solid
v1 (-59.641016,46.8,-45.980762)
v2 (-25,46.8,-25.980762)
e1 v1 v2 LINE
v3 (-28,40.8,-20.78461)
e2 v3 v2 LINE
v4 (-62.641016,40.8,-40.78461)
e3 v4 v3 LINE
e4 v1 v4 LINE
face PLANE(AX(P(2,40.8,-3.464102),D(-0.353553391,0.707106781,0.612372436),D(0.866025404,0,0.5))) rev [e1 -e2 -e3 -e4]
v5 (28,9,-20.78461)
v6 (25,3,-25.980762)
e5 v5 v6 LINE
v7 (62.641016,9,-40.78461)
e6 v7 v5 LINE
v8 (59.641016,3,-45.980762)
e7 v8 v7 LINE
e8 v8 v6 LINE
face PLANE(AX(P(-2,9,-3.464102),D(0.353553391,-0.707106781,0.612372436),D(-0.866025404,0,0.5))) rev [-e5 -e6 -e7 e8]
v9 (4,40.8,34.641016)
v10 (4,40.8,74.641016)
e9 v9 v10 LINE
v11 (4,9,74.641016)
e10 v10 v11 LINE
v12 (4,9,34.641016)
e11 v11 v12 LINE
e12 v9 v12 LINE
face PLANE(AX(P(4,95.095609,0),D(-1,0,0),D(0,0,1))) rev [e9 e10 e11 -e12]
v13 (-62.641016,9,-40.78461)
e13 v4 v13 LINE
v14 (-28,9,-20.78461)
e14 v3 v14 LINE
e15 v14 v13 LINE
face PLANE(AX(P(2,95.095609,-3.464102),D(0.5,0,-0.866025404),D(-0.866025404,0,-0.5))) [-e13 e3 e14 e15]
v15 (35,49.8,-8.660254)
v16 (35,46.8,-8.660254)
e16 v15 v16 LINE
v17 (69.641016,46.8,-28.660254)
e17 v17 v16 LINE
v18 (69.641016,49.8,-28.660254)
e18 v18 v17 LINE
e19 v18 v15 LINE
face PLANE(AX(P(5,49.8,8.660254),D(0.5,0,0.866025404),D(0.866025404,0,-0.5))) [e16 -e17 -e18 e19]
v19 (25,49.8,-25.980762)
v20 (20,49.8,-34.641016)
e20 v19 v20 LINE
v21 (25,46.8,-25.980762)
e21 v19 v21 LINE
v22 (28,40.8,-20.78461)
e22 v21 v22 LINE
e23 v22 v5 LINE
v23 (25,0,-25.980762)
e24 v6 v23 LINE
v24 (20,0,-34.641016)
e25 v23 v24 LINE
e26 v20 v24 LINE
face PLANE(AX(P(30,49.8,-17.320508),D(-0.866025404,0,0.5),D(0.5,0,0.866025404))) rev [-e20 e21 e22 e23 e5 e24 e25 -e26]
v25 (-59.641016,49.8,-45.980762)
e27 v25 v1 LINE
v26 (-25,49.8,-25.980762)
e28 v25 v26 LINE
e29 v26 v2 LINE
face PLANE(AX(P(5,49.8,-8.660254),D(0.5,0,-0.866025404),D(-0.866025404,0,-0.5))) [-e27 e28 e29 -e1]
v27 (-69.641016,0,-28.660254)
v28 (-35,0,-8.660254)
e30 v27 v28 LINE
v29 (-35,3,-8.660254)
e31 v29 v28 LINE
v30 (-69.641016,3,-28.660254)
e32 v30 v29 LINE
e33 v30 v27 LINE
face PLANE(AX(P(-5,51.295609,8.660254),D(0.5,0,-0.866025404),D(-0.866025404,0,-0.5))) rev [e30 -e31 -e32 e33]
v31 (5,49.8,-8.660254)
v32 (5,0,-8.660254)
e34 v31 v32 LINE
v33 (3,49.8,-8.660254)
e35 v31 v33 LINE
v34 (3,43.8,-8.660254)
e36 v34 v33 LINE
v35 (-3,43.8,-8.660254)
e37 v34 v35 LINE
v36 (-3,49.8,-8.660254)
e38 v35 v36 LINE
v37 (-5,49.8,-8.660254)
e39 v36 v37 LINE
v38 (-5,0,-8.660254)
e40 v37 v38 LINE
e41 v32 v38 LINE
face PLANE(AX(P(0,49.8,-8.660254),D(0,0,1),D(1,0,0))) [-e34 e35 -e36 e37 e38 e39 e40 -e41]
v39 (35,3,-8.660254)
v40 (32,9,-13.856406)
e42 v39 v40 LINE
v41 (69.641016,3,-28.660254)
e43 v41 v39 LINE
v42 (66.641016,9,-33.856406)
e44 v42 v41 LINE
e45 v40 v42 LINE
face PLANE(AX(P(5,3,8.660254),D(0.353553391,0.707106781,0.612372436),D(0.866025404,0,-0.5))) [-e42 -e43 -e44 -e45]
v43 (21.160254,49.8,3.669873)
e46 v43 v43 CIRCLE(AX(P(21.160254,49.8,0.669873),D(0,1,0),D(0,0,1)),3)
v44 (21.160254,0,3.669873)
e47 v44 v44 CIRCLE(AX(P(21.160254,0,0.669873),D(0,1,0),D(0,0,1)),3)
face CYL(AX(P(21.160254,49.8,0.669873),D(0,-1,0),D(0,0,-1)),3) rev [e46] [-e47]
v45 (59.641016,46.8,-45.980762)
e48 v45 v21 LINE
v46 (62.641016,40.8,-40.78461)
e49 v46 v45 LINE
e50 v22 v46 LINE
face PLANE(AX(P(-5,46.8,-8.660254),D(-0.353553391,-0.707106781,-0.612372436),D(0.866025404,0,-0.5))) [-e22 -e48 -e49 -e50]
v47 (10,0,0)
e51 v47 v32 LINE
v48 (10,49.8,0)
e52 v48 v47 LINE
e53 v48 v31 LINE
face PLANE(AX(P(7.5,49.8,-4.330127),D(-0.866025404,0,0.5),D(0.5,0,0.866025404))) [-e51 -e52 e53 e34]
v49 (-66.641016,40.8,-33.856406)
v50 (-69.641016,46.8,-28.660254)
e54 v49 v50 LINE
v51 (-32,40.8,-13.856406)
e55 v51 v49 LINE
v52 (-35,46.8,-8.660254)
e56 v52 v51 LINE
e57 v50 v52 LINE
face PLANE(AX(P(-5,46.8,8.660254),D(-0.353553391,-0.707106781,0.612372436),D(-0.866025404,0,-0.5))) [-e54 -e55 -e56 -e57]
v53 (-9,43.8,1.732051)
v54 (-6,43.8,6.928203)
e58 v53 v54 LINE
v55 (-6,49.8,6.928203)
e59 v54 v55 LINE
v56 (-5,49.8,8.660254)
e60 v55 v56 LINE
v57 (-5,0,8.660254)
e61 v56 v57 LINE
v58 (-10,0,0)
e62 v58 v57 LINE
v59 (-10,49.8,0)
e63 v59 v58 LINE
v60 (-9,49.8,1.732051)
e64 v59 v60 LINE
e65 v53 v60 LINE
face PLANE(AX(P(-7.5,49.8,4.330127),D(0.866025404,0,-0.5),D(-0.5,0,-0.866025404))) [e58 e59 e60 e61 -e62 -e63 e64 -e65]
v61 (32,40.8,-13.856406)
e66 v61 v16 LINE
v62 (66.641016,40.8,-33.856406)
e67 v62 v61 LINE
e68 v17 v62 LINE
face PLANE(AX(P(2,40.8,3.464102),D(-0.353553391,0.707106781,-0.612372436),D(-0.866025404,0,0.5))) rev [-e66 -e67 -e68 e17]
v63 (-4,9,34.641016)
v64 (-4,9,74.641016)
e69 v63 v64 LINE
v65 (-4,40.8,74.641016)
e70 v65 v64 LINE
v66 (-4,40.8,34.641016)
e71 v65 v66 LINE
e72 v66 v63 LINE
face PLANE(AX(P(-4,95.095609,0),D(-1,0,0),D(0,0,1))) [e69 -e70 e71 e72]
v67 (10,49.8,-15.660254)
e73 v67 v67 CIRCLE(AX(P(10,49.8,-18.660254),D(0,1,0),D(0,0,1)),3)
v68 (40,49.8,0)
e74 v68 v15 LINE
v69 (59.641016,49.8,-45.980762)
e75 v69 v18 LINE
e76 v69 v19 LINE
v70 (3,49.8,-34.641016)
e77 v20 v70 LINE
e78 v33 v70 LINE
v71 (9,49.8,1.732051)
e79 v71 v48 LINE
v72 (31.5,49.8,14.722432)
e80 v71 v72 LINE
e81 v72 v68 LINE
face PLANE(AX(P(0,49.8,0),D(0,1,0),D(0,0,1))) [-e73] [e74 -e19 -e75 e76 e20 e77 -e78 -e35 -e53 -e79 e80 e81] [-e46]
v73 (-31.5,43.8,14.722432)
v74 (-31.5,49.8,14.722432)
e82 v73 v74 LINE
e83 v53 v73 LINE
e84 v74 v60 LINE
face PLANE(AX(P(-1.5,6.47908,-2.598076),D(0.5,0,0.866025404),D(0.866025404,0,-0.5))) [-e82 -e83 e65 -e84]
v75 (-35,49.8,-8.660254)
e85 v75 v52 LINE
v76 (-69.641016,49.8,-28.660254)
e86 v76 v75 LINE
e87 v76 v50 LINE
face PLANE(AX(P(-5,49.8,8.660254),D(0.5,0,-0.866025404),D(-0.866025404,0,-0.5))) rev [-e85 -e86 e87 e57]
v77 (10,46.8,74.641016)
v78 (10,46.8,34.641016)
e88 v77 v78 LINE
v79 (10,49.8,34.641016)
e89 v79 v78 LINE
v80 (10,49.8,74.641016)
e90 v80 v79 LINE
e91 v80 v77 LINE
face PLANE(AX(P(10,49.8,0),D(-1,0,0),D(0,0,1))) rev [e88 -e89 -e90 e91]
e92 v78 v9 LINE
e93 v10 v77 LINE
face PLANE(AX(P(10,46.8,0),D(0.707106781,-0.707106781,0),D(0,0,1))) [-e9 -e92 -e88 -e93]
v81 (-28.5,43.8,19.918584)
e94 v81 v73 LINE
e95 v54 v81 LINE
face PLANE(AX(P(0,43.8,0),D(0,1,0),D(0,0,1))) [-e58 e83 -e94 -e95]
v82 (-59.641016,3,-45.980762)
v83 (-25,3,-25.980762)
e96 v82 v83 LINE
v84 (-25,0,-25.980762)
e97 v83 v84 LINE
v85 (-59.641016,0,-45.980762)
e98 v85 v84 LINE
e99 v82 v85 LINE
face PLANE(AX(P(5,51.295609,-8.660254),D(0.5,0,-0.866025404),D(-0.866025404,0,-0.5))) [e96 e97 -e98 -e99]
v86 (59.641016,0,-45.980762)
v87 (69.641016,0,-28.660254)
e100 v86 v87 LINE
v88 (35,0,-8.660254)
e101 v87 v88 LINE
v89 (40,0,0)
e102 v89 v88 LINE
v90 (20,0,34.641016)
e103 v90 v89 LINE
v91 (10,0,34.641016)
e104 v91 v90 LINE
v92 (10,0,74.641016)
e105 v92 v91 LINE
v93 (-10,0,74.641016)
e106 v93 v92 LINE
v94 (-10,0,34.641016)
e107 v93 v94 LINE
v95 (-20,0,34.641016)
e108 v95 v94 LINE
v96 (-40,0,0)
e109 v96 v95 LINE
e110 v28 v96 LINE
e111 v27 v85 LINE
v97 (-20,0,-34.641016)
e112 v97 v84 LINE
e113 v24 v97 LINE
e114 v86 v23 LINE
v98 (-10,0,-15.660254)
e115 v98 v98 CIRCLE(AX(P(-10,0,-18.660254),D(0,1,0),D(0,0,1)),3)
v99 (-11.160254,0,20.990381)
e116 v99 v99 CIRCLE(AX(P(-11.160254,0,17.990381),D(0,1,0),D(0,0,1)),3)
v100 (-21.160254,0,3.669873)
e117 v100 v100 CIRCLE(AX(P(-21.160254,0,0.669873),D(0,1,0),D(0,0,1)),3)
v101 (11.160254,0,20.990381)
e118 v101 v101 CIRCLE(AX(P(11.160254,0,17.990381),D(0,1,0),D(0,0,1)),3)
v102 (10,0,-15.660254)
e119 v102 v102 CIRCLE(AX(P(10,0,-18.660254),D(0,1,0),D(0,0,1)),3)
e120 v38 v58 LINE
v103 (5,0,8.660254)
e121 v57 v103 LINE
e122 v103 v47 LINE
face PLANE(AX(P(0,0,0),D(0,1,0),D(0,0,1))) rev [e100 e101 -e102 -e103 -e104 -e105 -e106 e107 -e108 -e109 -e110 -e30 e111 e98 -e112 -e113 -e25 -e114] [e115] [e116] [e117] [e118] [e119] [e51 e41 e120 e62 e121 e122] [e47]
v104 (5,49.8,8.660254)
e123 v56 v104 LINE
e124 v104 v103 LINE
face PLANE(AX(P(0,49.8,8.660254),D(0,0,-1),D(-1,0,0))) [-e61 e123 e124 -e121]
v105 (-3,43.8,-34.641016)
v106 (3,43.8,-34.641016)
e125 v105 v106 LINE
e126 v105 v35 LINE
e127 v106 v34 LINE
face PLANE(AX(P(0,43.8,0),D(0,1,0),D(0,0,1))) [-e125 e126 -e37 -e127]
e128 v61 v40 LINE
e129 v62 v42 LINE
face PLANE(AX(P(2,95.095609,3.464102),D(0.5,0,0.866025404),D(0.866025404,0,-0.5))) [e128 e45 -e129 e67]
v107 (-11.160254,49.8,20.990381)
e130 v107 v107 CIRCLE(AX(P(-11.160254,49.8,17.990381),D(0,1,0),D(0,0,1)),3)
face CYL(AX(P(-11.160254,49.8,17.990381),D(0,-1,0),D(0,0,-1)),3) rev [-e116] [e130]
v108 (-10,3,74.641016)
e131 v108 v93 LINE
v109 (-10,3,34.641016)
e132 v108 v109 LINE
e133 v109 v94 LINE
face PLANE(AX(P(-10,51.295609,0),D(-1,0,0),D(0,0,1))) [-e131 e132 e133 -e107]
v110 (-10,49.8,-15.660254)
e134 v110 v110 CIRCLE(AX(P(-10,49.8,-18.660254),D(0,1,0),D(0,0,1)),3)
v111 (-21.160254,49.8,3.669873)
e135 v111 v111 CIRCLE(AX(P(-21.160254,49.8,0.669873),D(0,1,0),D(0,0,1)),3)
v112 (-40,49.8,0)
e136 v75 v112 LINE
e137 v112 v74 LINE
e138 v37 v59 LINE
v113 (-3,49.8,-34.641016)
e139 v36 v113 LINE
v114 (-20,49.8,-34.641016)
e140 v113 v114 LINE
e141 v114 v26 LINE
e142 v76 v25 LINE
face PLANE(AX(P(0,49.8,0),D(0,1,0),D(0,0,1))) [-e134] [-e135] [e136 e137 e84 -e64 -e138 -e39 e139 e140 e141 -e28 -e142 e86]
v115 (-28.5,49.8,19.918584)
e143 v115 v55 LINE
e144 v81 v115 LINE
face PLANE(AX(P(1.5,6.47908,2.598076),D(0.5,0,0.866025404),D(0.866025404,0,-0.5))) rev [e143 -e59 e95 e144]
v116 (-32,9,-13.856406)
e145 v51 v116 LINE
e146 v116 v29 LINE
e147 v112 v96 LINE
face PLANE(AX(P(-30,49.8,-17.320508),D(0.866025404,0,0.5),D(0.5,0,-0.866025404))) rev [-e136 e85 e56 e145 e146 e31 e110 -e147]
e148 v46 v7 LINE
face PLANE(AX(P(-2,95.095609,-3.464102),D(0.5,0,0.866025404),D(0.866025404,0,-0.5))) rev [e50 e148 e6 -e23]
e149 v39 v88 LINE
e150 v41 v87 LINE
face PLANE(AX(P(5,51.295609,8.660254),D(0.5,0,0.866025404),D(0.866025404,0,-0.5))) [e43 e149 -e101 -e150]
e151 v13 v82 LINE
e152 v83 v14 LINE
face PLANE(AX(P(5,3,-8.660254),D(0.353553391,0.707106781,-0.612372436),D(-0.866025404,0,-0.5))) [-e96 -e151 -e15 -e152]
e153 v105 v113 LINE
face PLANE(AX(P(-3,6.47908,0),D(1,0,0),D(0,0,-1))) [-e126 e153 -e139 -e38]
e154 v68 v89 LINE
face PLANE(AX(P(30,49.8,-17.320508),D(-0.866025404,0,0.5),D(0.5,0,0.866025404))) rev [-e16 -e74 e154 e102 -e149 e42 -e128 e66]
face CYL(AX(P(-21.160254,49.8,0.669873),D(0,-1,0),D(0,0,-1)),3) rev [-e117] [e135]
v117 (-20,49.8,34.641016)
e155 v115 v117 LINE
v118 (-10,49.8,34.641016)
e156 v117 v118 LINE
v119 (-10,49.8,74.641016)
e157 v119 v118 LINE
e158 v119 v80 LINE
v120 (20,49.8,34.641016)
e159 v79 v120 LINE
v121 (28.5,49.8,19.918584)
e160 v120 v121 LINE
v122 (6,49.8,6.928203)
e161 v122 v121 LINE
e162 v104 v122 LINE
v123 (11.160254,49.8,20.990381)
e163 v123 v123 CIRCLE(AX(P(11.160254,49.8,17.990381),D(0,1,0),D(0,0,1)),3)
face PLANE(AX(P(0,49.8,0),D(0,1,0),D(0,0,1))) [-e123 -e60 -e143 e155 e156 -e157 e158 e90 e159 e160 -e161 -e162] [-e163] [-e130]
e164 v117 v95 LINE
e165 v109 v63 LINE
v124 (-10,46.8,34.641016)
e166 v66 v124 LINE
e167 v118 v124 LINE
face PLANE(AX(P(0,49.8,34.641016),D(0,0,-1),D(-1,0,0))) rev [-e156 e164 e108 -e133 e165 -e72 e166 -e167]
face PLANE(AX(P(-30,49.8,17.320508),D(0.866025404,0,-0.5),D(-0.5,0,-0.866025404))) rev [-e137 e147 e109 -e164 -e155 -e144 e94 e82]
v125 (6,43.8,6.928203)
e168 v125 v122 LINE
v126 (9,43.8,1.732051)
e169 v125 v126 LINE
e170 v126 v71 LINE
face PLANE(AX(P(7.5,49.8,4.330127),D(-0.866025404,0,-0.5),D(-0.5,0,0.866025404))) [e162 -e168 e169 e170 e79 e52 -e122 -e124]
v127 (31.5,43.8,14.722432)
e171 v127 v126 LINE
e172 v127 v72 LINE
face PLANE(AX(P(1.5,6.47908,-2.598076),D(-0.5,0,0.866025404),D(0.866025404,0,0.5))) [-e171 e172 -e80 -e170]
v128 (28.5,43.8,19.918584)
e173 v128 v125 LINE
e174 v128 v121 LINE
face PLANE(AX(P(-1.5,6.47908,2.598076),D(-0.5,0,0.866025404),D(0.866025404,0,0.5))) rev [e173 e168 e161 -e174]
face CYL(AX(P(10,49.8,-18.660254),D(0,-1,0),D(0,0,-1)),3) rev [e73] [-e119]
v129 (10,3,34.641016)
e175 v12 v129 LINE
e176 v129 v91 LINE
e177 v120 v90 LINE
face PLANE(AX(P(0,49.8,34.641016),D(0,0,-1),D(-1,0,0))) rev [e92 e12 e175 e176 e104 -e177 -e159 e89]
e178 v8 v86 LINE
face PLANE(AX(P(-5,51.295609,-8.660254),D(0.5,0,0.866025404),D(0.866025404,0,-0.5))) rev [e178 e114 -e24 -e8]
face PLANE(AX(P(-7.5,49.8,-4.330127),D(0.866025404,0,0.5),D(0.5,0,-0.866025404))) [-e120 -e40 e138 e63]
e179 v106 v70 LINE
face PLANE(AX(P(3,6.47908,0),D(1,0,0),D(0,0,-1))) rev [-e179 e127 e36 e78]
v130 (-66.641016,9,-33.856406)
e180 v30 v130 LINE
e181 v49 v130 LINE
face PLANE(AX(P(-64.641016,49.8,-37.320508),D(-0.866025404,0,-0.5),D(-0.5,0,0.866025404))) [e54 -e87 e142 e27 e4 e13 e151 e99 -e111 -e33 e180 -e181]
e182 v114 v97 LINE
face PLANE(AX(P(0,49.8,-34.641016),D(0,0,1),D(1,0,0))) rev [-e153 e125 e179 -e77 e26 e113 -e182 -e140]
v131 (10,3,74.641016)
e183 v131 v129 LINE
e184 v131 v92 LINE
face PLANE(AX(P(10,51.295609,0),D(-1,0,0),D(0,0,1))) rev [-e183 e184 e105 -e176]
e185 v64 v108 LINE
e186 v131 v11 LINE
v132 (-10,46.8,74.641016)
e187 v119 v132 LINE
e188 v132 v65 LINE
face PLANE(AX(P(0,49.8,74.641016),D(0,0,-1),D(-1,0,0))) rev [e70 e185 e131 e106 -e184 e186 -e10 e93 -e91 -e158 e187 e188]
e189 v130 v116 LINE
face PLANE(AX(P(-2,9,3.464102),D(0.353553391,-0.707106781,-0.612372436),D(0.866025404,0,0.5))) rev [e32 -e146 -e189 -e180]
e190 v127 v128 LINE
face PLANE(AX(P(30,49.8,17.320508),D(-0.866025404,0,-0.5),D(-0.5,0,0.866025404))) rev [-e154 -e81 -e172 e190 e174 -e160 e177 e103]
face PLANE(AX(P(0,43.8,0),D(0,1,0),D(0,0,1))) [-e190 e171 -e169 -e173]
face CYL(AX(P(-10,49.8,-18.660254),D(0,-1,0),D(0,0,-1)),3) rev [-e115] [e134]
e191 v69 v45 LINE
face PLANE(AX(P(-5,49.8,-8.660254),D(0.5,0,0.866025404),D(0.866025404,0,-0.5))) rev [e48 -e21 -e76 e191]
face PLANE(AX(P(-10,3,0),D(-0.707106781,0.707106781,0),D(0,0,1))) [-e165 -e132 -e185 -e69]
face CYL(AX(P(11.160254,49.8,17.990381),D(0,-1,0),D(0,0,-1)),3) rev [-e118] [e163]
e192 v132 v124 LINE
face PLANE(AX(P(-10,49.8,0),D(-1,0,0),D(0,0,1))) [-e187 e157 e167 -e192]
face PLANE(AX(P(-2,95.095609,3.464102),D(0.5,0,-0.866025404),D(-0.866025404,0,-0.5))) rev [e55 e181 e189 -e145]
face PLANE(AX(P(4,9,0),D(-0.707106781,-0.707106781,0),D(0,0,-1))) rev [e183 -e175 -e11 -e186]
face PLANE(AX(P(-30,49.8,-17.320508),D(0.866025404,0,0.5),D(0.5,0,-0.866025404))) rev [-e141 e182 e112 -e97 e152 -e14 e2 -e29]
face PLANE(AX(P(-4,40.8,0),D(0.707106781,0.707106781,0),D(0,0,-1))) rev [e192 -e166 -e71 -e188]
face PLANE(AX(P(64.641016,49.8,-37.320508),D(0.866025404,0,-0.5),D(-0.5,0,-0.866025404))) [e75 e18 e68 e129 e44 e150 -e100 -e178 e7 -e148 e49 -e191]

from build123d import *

# Parameters (mm, degrees)
SKETCH1_R           = 3
SKETCH1_W           = 6
SKETCH1_H           = 40
SKETCH1_W_2         = 8
BOSS_EXTRUDE1_DEPTH = 49.8
SKETCH1_4_W         = 6
SKETCH1_4_H         = 40
CUT_EXTRUDE2_DEPTH  = 46.8
SKETCH1_5_W         = 6
SKETCH1_5_H         = 40
BOSS_EXTRUDE3_DEPTH = 3
CHAMFER1_SIZE       = 6
SKETCH2_3_W         = 6
SKETCH2_3_H         = 17.980762113
SKETCH2_3_H_2       = 3
SKETCH2_3_H_3       = 5
CUT_EXTRUDE3_DEPTH  = 6


with BuildPart() as part:
    # Sketch1 → Boss-Extrude1 (new body)
    # profile 1 of 10: a face of its own
    with BuildSketch(Plane(origin=(0, 0, 0), x_dir=(1, 0, 0), z_dir=(0, 1, 0))):
        Polygon((20, -34.641016151), (40, 0), (20, 34.641016151), (-20, 34.641016151), (-40, 0), (-20, -34.641016151), align=None)
        with Locations(Location((21.160254038, -0.669872981, 0), (0, 0, 270))):
            Circle(SKETCH1_R, mode=Mode.SUBTRACT)
        with Locations(Location((10, 18.660254038, 0), (0, 0, 270))):
            Circle(SKETCH1_R, mode=Mode.SUBTRACT)
        with Locations(Location((-10, 18.660254038, 0), (0, 0, 270))):
            Circle(SKETCH1_R, mode=Mode.SUBTRACT)
        with Locations(Location((-21.160254038, -0.669872981, 0), (0, 0, 270))):
            Circle(SKETCH1_R, mode=Mode.SUBTRACT)
        with Locations(Location((11.160254038, -17.990381057, 0), (0, 0, 270))):
            Circle(SKETCH1_R, mode=Mode.SUBTRACT)
        with Locations(Location((-11.160254038, -17.990381057, 0), (0, 0, 270))):
            Circle(SKETCH1_R, mode=Mode.SUBTRACT)
        Polygon((10, 0), (5, 8.660254038), (-5, 8.660254038), (-10, 0), (-5, -8.660254038), (5, -8.660254038), align=None, mode=Mode.SUBTRACT)
    # profile 2 of 10: a face of its own
    with BuildSketch(Plane(origin=(0, 0, 0), x_dir=(1, 0, 0), z_dir=(0, 1, 0))):
        Polygon((-28, 20.784609691), (-25, 25.980762114), (-59.641016151, 45.980762114), (-62.641016151, 40.784609691), align=None)
    # profile 3 of 10: a face of its own
    with BuildSketch(Plane(origin=(0, 0, 0), x_dir=(1, 0, 0), z_dir=(0, 1, 0))):
        Polygon((-32, 13.856406461), (-28, 20.784609691), (-62.641016151, 40.784609691), (-66.641016151, 33.856406461), align=None)
    # profile 4 of 10: a face of its own
    with BuildSketch(Plane(origin=(0, 0, 0), x_dir=(1, 0, 0), z_dir=(0, 1, 0))):
        Polygon((-35, 8.660254038), (-32, 13.856406461), (-66.641016151, 33.856406461), (-69.641016151, 28.660254038), align=None)
    # profile 5 of 10: a face of its own
    with BuildSketch(Plane(origin=(0, 0, 0), x_dir=(1, 0, 0), z_dir=(0, 1, 0))):
        Polygon((59.641016151, 45.980762114), (25, 25.980762114), (28, 20.784609691), (62.641016151, 40.784609691), align=None)
    # profile 6 of 10: a face of its own
    with BuildSketch(Plane(origin=(0, 0, 0), x_dir=(1, 0, 0), z_dir=(0, 1, 0))):
        Polygon((62.641016151, 40.784609691), (28, 20.784609691), (32, 13.856406461), (66.641016151, 33.856406461), align=None)
    # profile 7 of 10: a face of its own
    with BuildSketch(Plane(origin=(0, 0, 0), x_dir=(1, 0, 0), z_dir=(0, 1, 0))):
        Polygon((66.641016151, 33.856406461), (32, 13.856406461), (35, 8.660254038), (69.641016151, 28.660254038), align=None)
    # profile 8 of 10: a face of its own
    with BuildSketch(Plane(origin=(0, 0, 0), x_dir=(1, 0, 0), z_dir=(0, 1, 0))):
        with Locations((7, -54.641016151)):
            Rectangle(SKETCH1_W, SKETCH1_H)
    # profile 9 of 10: a face of its own
    with BuildSketch(Plane(origin=(0, 0, 0), x_dir=(1, 0, 0), z_dir=(0, 1, 0))):
        with Locations((-7, -54.641016151)):
            Rectangle(SKETCH1_W, SKETCH1_H)
    # profile 10 of 10: a face of its own
    with BuildSketch(Plane(origin=(0, 0, 0), x_dir=(1, 0, 0), z_dir=(0, 1, 0))):
        with Locations((0, -54.641016151)):
            Rectangle(SKETCH1_W_2, SKETCH1_H)
    extrude(amount=BOSS_EXTRUDE1_DEPTH)

    # Sketch1<4> → Cut-Extrude2 (cut)
    with BuildSketch(Plane(origin=(0, 0, 0), x_dir=(1, 0, 0), z_dir=(0, 1, 0))):
        Polygon((59.641016151, 45.980762114), (25, 25.980762114), (28, 20.784609691), (62.641016151, 40.784609691), align=None)
        Polygon((-28, 20.784609691), (-25, 25.980762114), (-59.641016151, 45.980762114), (-62.641016151, 40.784609691), align=None)
        Polygon((66.641016151, 33.856406461), (32, 13.856406461), (35, 8.660254038), (69.641016151, 28.660254038), align=None)
        Polygon((-35, 8.660254038), (-32, 13.856406461), (-66.641016151, 33.856406461), (-69.641016151, 28.660254038), align=None)
        with Locations((7, -54.641016151)):
            Rectangle(SKETCH1_4_W, SKETCH1_4_H)
        with Locations((-7, -54.641016151)):
            Rectangle(SKETCH1_4_W, SKETCH1_4_H)
    extrude(amount=CUT_EXTRUDE2_DEPTH, mode=Mode.SUBTRACT)

    # Sketch1<5> → Boss-Extrude3 (add)
    with BuildSketch(Plane(origin=(0, 0, 0), x_dir=(1, 0, 0), z_dir=(0, 1, 0))):
        with Locations((-7, -54.641016151)):
            Rectangle(SKETCH1_5_W, SKETCH1_5_H)
        with Locations((7, -54.641016151)):
            Rectangle(SKETCH1_5_W, SKETCH1_5_H)
        Polygon((-35, 8.660254038), (-32, 13.856406461), (-66.641016151, 33.856406461), (-69.641016151, 28.660254038), align=None)
        Polygon((-28, 20.784609691), (-25, 25.980762114), (-59.641016151, 45.980762114), (-62.641016151, 40.784609691), align=None)
        Polygon((66.641016151, 33.856406461), (32, 13.856406461), (35, 8.660254038), (69.641016151, 28.660254038), align=None)
        Polygon((59.641016151, 45.980762114), (25, 25.980762114), (28, 20.784609691), (62.641016151, 40.784609691), align=None)
    extrude(amount=BOSS_EXTRUDE3_DEPTH)

    # Chamfer1
    chamfer1_edges = [part.edges().sort_by_distance(p)[0] for p in [
        (-45.320508076, 46.8, -30.784609691),
        (-45.320508076, 3, -30.784609691),
        (-49.320508076, 46.8, -23.856406461),
        (-49.320508076, 3, -23.856406461),
        (49.320508076, 46.8, -23.856406461),
        (45.320508076, 46.8, -30.784609691),
        (45.320508076, 3, -30.784609691),
        (49.320508076, 3, -23.856406461),
        (-4, 3, 54.641016151),
        (4, 3, 54.641016151),
        (4, 46.8, 54.641016151),
        (-4, 46.8, 54.641016151),
    ]]
    chamfer(chamfer1_edges, length=CHAMFER1_SIZE - 0.0001)  # a hair under: the kernel refuses the full size

    # Sketch2<3> → Cut-Extrude3 (cut)
    with BuildSketch(Plane(origin=(0, 49.8, 0), x_dir=(1, 0, 0), z_dir=(0, 1, 0))):
        Polygon((-24.169872981, -17.418584287), (-27.169872981, -12.222431864), (-31.5, -14.722431864), (-28.5, -19.918584287), align=None)
        Polygon((-9, -1.732050808), (-11.598076211, -3.232050808), (-8.598076211, -8.42820323), (-6, -6.92820323), align=None)
        Polygon((8.598076211, -8.42820323), (11.598076211, -3.232050808), (9, -1.732050808), (6, -6.92820323), align=None)
        Polygon((31.5, -14.722431864), (27.169872981, -12.222431864), (24.169872981, -17.418584287), (28.5, -19.918584287), align=None)
        Polygon((27.169872981, -12.222431864), (11.598076211, -3.232050808), (8.598076211, -8.42820323), (24.169872981, -17.418584287), align=None)
        Polygon((-11.598076211, -3.232050808), (-27.169872981, -12.222431864), (-24.169872981, -17.418584287), (-8.598076211, -8.42820323), align=None)
        with Locations((0, 20.650635095)):
            Rectangle(SKETCH2_3_W, SKETCH2_3_H)
        with Locations((0, 10.160254038)):
            Rectangle(SKETCH2_3_W, SKETCH2_3_H_2)
        with Locations((0, 32.141016151)):
            Rectangle(SKETCH2_3_W, SKETCH2_3_H_3)
    extrude(amount=-CUT_EXTRUDE3_DEPTH, mode=Mode.SUBTRACT)


solid = part.part
